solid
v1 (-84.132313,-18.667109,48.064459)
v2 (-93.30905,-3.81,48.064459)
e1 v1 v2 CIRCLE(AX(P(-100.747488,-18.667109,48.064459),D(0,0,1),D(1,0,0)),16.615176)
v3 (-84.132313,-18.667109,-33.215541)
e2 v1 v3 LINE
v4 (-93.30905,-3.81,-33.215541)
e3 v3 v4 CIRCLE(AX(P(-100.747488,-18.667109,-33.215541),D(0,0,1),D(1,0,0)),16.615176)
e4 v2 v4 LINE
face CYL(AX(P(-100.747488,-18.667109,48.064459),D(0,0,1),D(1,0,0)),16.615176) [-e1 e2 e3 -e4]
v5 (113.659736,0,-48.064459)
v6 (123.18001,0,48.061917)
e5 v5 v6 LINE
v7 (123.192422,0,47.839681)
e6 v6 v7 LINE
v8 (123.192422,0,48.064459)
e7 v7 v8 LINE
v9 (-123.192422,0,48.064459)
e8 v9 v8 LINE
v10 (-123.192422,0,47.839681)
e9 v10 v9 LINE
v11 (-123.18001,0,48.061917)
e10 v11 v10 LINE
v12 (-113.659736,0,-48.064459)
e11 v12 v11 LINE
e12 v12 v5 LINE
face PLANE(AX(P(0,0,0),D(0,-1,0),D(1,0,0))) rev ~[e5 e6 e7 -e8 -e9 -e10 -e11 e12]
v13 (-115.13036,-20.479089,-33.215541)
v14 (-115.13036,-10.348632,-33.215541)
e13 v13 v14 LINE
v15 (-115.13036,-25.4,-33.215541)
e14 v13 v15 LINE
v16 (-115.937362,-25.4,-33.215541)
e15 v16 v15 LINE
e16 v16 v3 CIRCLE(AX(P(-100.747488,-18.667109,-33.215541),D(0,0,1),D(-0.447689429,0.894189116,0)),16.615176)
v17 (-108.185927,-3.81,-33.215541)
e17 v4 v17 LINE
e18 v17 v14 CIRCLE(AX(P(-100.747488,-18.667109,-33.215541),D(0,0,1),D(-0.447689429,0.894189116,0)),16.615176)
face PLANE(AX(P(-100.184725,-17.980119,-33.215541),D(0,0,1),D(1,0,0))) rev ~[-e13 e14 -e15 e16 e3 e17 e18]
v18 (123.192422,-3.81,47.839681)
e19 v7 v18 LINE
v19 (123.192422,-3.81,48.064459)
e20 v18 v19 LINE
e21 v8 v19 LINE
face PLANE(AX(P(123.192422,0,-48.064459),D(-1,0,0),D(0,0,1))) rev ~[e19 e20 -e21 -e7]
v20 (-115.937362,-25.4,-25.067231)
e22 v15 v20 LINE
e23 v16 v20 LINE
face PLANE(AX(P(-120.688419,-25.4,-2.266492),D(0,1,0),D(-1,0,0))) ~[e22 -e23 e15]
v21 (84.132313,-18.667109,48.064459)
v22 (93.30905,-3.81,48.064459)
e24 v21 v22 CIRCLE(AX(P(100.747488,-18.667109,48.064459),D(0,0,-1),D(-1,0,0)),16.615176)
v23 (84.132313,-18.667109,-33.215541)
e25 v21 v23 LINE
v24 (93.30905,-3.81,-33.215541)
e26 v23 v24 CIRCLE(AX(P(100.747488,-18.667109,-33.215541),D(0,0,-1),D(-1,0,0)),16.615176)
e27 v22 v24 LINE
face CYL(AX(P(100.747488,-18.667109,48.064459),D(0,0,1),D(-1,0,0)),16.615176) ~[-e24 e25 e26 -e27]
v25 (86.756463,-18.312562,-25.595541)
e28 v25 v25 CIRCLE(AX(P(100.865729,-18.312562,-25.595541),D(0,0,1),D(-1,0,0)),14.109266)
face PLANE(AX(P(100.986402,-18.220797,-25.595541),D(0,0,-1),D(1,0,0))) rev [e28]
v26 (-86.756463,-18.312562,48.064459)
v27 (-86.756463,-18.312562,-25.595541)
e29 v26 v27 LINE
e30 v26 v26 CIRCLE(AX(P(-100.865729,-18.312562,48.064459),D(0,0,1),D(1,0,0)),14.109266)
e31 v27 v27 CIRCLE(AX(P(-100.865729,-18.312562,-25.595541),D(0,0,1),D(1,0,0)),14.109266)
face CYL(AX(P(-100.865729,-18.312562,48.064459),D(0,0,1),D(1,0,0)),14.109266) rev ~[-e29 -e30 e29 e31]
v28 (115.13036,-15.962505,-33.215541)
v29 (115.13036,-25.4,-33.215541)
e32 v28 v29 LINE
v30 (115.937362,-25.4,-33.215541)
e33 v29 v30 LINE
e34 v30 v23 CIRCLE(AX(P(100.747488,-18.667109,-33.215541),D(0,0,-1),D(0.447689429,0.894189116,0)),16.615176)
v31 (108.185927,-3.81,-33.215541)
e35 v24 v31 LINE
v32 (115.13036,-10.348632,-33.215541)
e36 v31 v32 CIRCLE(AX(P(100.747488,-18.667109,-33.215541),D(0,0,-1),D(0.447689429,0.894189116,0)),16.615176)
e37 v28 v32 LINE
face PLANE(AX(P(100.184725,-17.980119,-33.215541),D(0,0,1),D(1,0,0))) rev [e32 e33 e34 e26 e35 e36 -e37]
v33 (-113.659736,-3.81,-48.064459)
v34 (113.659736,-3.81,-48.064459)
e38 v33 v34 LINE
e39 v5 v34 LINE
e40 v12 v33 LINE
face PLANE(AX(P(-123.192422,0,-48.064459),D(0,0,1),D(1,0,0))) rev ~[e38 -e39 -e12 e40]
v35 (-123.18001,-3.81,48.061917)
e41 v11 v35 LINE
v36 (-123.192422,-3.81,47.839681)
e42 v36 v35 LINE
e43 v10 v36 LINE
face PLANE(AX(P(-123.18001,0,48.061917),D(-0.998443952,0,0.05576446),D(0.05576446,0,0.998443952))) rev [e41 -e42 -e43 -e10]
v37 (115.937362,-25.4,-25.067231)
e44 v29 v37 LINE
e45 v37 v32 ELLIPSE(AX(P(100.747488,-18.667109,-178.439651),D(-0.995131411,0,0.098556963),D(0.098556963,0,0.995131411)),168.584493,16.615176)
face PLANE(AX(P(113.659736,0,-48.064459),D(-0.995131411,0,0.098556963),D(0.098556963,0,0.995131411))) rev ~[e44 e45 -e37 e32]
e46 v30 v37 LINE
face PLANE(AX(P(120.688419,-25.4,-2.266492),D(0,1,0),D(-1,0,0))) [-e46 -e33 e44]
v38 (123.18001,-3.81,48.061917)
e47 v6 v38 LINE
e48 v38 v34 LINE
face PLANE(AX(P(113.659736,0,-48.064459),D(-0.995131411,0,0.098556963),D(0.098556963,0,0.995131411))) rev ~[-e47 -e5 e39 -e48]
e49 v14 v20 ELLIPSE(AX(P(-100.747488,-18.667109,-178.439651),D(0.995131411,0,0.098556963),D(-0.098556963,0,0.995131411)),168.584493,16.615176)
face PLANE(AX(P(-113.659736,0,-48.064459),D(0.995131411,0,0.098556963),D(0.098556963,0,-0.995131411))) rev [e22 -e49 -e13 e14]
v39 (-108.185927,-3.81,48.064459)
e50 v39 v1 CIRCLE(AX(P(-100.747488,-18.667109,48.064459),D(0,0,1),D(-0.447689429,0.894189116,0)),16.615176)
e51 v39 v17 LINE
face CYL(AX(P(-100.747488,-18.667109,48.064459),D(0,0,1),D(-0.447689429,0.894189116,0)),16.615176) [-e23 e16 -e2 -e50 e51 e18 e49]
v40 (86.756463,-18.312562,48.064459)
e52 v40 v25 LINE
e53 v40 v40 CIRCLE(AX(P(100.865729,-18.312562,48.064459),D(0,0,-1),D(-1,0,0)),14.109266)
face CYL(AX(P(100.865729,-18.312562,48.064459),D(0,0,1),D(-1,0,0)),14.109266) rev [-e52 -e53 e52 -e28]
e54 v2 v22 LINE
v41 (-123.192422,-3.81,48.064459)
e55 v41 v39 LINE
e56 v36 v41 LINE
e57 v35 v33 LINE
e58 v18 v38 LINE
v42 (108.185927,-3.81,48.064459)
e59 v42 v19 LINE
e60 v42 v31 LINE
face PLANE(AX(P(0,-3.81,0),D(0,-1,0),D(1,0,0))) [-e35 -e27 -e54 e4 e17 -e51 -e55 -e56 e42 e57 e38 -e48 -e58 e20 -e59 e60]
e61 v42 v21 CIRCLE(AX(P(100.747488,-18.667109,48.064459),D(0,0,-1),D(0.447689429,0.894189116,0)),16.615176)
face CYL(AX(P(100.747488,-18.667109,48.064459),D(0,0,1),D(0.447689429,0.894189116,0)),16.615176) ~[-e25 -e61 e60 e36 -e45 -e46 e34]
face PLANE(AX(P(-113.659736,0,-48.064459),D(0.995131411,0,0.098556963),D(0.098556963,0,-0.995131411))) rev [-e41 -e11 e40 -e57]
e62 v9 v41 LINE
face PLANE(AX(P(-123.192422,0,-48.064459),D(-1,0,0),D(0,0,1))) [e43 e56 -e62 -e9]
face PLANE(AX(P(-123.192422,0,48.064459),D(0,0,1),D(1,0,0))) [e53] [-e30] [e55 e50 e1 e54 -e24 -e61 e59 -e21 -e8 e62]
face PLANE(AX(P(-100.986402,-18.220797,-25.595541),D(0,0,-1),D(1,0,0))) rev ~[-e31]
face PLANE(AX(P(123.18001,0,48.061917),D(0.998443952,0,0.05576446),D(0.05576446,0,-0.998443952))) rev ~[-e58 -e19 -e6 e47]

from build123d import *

# Parameters (mm, degrees)
F0_W     = 246.3848441839
F0_H     = 96.1289182305
F1_DEPTH = 3.81
F2_R     = 14.1092662394
F3_DEPTH = 81.28
F5_DEPTH = 25.4
F6_R     = 14.1092662394
F7_DEPTH = 7.62


# Not quite as in the source:
# - a pattern or mirror of a feature is missing from the dataset's text; its kind, count and spacing are read off the source's solid
# - a feature names something its author has since deleted; it is built from what else it names


with BuildPart() as f1:
    # F0 (on Front) → F1 (new body)
    with BuildSketch(Plane.XZ):
        Rectangle(F0_W, F0_H)
    extrude(amount=F1_DEPTH)

    # F2 (on face) → F3 (join)
    with BuildSketch(Plane.XY.offset(48.0644591153)):
        with BuildLine():
            ThreePointArc((-108.1859269769, -3.81), (-109.4788428986, -32.8031453268), (-84.1323126967, -18.6671093106))
            ThreePointArc((-84.1323126967, -18.6671093106), (-86.6114524229, -9.9357548511), (-93.3090499012, -3.81))
            Line((-93.3090499012, -3.81), (-108.1859269769, -3.81))
        make_face()
        with Locations((-100.8657291532, -18.3125622571)):
            Circle(F2_R, mode=Mode.SUBTRACT)
    f3 = extrude(amount=-F3_DEPTH)

    # F3_copies: F3 across plane
    add(f3.mirror(Plane(origin=(0, 0, 0), x_dir=(0, 0, 1), z_dir=(1, 0, 0))))

    # F4 (on face) → F5 (cut)
    with BuildSketch(Plane(origin=(0, 0, 0), x_dir=(-1, 0, 0), z_dir=(0, 1, 0))):
        Polygon((-113.6597358778, -48.0644591153), (-123.1800099188, 48.0619171371), (-123.192422092, 47.8396813394), (-123.192422092, -48.0644591153), align=None)
    f5 = extrude(amount=-F5_DEPTH, mode=Mode.SUBTRACT)

    # F5_copies: F5 across plane
    add(f5.mirror(Plane(origin=(0, 0, 0), x_dir=(0, 0, -1), z_dir=(-1, 0, 0))), mode=Mode.SUBTRACT)

    # F6 (on face) → F7 (join)
    with BuildSketch(Plane(origin=(0, 0, -33.2155408847), x_dir=(1, 0, 0), z_dir=(0, 0, -1))):
        with BuildLine():
            ThreePointArc((-115.130360032, 15.9625050025), (-99.772384803, 3.8619408749), (-86.5015784629, 18.2207971811))
            ThreePointArc((-86.5015784629, 18.2207971811), (-99.772384803, 32.5796534874), (-115.130360032, 20.4790893598))
            Line((-115.130360032, 20.4790893598), (-115.130360032, 15.9625050025))
        make_face()
        with Locations((-100.8657291532, 18.3125622571)):
            Circle(F6_R, mode=Mode.SUBTRACT)
        with Locations((-100.8657291532, 18.3125622571)):
            Circle(F6_R)
    f7 = extrude(amount=-F7_DEPTH)

    # F7_copies: F7 across plane
    add(f7.mirror(Plane(origin=(0, 0, 0), x_dir=(0, 0, 1), z_dir=(1, 0, 0))))


solid = f1.part
